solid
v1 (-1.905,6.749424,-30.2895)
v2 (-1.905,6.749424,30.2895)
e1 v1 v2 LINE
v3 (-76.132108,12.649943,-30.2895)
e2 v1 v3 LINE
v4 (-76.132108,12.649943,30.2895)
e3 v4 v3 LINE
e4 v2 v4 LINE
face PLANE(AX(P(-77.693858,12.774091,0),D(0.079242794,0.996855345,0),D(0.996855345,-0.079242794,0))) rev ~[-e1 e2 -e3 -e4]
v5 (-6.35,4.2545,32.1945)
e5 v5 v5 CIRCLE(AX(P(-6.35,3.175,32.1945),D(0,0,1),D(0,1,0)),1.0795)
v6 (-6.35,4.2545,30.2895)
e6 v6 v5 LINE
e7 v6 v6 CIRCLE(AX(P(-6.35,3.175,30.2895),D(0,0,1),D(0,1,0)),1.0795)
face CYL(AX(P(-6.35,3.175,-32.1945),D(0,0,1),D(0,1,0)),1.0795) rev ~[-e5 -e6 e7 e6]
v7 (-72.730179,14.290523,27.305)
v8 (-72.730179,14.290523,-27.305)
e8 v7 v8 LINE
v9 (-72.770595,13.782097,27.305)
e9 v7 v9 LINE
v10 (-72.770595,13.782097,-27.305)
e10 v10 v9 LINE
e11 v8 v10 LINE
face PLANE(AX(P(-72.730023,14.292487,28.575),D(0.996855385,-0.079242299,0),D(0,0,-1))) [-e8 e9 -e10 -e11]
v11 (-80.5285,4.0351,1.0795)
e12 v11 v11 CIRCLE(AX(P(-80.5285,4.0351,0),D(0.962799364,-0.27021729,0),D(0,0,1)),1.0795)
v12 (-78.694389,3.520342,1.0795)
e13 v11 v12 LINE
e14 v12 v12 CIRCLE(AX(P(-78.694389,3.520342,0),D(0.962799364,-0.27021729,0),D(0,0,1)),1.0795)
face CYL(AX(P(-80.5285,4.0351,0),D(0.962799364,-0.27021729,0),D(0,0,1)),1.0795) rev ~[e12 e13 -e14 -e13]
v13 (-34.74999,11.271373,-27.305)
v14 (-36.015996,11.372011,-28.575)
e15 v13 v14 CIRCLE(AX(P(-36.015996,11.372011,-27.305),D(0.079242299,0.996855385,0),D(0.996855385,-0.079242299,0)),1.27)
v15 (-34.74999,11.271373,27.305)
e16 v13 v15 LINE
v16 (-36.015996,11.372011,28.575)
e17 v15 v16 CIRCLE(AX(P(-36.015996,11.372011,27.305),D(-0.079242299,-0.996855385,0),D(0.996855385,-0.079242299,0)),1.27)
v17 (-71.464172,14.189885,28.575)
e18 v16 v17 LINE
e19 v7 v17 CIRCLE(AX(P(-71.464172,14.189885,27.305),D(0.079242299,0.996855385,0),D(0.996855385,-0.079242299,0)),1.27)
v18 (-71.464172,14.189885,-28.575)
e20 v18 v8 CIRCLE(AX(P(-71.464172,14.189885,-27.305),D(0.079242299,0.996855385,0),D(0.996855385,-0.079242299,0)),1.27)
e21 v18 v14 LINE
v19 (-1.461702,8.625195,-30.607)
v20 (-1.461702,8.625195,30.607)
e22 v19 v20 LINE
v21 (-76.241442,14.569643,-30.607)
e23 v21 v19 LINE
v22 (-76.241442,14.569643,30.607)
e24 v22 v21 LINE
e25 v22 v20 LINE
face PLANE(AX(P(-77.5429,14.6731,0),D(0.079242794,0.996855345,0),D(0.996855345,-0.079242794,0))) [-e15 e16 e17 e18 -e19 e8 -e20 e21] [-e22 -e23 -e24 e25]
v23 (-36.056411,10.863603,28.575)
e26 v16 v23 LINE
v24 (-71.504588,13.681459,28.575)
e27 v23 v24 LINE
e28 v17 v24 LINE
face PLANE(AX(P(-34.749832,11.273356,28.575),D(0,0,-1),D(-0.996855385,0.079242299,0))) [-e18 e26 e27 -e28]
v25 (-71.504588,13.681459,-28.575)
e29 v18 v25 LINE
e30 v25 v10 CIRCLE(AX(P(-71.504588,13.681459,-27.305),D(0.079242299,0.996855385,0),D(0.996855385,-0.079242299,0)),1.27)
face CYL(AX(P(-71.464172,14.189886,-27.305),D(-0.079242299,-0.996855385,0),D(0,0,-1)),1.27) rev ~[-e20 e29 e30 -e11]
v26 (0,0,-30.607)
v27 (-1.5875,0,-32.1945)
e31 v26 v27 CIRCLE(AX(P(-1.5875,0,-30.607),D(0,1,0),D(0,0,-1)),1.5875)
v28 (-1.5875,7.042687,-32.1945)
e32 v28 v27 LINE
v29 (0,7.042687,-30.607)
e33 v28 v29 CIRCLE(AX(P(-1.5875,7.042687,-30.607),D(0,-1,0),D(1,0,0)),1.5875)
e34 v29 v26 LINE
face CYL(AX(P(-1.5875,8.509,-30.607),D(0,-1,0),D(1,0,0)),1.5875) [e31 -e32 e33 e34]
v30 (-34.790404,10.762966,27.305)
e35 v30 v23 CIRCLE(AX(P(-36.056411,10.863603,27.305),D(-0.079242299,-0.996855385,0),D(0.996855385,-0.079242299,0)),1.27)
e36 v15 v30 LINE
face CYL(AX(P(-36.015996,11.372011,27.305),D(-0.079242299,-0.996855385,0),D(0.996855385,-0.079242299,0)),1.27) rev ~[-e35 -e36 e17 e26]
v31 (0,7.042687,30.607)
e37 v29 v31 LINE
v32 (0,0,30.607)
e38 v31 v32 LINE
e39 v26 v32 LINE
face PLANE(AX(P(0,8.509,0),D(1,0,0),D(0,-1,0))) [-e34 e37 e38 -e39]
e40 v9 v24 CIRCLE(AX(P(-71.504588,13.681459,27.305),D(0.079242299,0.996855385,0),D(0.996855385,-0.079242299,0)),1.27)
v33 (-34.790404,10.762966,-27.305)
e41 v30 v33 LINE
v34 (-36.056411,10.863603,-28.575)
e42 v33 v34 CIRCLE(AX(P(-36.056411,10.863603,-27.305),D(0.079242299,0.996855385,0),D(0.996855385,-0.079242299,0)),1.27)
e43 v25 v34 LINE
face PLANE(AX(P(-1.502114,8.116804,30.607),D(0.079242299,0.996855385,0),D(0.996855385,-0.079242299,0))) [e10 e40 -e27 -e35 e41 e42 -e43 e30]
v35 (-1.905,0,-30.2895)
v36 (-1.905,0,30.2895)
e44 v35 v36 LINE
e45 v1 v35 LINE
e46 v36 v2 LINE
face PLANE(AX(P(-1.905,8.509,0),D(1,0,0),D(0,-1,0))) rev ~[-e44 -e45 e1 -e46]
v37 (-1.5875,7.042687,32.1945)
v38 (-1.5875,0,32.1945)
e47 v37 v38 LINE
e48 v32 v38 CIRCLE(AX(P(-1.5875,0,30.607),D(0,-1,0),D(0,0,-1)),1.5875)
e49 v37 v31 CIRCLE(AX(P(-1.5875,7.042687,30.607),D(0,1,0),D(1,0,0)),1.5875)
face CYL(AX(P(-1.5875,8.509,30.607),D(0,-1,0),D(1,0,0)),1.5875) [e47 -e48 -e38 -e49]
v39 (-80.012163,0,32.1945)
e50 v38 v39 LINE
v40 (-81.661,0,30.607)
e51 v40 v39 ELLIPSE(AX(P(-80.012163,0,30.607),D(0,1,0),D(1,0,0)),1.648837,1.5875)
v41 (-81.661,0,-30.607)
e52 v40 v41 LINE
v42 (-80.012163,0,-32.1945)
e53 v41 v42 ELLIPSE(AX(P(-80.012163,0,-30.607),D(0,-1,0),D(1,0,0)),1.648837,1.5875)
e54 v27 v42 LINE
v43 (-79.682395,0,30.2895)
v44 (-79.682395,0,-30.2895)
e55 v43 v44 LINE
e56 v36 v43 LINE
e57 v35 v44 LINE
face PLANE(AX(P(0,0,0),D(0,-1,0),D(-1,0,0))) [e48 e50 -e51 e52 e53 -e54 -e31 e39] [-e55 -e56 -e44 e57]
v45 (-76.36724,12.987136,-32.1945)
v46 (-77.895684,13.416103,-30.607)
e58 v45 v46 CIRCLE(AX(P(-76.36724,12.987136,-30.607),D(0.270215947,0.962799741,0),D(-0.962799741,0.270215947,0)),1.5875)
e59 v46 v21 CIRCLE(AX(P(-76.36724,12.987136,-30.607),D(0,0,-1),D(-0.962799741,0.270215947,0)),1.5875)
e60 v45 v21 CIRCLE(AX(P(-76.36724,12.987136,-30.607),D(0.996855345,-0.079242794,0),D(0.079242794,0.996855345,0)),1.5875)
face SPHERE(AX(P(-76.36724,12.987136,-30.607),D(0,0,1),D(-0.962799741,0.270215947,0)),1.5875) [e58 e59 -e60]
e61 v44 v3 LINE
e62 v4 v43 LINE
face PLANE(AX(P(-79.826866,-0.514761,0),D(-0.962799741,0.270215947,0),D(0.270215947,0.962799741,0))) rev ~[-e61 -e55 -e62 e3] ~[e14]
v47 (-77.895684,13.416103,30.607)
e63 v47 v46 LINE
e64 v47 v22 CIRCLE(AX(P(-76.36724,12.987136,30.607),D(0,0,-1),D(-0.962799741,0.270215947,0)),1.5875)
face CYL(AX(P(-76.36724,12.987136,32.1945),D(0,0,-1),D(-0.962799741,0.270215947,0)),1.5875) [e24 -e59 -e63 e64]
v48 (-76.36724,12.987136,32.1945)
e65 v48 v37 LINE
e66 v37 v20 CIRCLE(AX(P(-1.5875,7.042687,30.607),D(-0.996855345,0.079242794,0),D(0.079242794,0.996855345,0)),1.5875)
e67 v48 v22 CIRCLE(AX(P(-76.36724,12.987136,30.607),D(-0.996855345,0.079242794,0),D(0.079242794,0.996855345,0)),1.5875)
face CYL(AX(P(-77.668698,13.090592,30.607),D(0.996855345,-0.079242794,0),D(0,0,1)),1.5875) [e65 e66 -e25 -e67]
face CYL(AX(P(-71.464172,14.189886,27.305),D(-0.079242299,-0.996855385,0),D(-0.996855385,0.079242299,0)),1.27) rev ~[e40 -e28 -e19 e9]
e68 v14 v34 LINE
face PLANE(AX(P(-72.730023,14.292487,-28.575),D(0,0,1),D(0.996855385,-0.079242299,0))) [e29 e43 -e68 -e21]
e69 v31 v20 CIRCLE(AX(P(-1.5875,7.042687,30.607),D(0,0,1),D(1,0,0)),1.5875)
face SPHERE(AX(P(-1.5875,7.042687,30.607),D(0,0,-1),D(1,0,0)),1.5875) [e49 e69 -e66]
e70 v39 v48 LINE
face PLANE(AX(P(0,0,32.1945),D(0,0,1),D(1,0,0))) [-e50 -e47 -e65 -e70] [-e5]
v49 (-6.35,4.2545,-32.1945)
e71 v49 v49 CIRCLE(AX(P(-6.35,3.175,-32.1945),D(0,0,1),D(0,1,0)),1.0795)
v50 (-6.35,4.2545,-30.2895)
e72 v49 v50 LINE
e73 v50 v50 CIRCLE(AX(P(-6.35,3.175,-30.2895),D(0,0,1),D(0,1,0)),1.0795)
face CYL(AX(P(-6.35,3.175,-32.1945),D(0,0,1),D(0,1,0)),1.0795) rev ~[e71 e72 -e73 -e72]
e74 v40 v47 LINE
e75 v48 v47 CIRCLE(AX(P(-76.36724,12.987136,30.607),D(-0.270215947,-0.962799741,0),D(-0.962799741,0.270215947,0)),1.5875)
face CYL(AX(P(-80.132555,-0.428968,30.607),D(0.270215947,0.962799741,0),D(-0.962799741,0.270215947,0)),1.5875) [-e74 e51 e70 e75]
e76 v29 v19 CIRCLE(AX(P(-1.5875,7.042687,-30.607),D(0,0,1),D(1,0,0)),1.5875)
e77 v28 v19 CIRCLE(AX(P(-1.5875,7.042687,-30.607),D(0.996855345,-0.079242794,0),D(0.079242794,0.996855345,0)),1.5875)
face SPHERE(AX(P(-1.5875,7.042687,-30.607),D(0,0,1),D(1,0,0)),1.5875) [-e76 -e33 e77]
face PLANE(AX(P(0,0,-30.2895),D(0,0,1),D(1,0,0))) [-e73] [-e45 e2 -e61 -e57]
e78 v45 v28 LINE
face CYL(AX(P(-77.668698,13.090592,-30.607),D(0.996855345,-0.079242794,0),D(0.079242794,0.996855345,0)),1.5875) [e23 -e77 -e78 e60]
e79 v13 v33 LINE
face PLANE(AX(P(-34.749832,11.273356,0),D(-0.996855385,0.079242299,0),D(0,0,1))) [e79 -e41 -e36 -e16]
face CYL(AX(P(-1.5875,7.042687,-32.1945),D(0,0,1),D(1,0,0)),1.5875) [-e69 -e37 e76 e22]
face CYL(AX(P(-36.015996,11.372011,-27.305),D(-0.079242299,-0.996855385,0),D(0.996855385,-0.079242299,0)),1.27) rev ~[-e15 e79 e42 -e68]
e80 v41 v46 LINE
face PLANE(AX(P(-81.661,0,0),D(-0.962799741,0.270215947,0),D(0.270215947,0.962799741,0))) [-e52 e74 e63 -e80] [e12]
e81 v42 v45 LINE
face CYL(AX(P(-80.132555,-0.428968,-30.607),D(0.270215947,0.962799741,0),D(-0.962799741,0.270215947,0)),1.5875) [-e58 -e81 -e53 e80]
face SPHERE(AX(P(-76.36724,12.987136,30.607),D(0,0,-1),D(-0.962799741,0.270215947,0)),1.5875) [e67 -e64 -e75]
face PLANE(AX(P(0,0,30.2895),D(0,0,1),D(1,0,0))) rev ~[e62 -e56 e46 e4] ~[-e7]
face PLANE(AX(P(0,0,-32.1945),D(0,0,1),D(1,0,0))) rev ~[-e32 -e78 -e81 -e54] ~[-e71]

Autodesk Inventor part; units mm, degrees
ref_plane "YZ Plane" through (0, 0, 0) normal (1, 0, 0) x (0, 1, 0)
ref_plane "XZ Plane" through (0, 0, 0) normal (0, 1, 0) x (-1, 0, 0)
ref_plane "XY Plane" through (0, 0, 0) normal (0, 0, 1) x (1, 0, 0)
sketch "Sketch1" plane through (0, 0, 0) normal (0, 0, 1) x (1, 0, 0)
  line L0 (0, 0) -> (-81.661, 0)
  line L1 (-81.661, 0) -> (-77.5429, 14.6731)
  line L2 (-77.5429, 14.6731) -> (0, 8.509)
  line L3 (0, 8.509) -> (0, 0)
  dimension "d0" = 81.661
  dimension "d1" = 15.24
  dimension "d2" = 77.7875
  dimension "d3" = 8.509
extrude "Extrusion1" add sketch "Sketch1" along normal mid plane 64.389
fillet "Fillet1" radius 1.5875 8 edges at (-38.7714, 11.591, 32.1945) (0, 8.509, 0) (0, 4.2545, 32.1945) (0, 4.2545, -32.1945) (-38.7714, 11.591, -32.1945) (-77.5429, 14.6731, 0) (-79.6019, 7.3365, -32.1945) (-79.6019, 7.3365, 32.1945)
shell "Shell1" thickness 1.905 removed faces 1 at (-53.8706, 0, 10.7315)
sketch "Sketch3" plane through (-1.4617, 8.6252, 30.607) normal (0.0792423, 0.9968554, 0) x (0.9968554, -0.0792423, 0)
  line L0 (-33.3933, 2.032) -> (-71.4933, 2.032)
  line L1 (-71.4933, 2.032) -> (-71.4933, 59.182)
  line L2 (-71.4933, 59.182) -> (-33.3933, 59.182)
  line L3 (-33.3933, 59.182) -> (-33.3933, 2.032)
  line L4 (-75.0156, 0) -> (-75.0156, 61.214) projected
  line L5 (-76.5733, 61.214) -> (-76.5733, 0) projected
  line L6 (2.1406, 30.607) -> (-92.8395, 30.607)
  point P0 (-71.4933, 30.607)
  dimension "d8" = 57.15
  dimension "d9" = 38.1
  dimension "d11" = 5.08
extrude "Extrusion2" cut sketch "Sketch3" against normal blind 0.508
fillet "Fillet2" radius 1.27 4 edges at (-34.7702, 11.0172, -28.575) (-72.7503, 14.0363, -28.575) (-72.7503, 14.0363, 28.575) (-34.7702, 11.0172, 28.575)
sketch "Sketch4" plane through (-77.8957, 13.4161, -30.607) normal (-0.9627994, 0.2702173, 0) x (0, 0, 1)
  line L0 (61.214, -13.9344) -> (0, -13.9344) projected
  line L1 (30.607, -13.9344) -> (30.607, -2.8384)
  point P0 (30.607, 8.1318)
  point P1 (30.607, -9.7434)
  dimension "d15" = 4.191
hole "Hole1" at (-80.5285, 4.0351, 0) direction (0.9627994, -0.2702173, 0) diameter 2.159 end through all
sketch "Sketch5" plane through (0, 0, -32.1945) normal (0, 0, -1) x (-1, 0, 0)
  line L0 (0, 7.0427) -> (0, 0) projected
  line L1 (1.5875, 0) -> (80.0122, 0) projected
  point P0 (6.35, 3.175)
  dimension "d23" = 6.35
  dimension "d24" = 3.175
hole "Hole2" at (-6.35, 3.175, -32.1945) direction (0, 0, 1) diameter 2.159 end through all
properties part number "Pedal" material "Steel, Cast"
